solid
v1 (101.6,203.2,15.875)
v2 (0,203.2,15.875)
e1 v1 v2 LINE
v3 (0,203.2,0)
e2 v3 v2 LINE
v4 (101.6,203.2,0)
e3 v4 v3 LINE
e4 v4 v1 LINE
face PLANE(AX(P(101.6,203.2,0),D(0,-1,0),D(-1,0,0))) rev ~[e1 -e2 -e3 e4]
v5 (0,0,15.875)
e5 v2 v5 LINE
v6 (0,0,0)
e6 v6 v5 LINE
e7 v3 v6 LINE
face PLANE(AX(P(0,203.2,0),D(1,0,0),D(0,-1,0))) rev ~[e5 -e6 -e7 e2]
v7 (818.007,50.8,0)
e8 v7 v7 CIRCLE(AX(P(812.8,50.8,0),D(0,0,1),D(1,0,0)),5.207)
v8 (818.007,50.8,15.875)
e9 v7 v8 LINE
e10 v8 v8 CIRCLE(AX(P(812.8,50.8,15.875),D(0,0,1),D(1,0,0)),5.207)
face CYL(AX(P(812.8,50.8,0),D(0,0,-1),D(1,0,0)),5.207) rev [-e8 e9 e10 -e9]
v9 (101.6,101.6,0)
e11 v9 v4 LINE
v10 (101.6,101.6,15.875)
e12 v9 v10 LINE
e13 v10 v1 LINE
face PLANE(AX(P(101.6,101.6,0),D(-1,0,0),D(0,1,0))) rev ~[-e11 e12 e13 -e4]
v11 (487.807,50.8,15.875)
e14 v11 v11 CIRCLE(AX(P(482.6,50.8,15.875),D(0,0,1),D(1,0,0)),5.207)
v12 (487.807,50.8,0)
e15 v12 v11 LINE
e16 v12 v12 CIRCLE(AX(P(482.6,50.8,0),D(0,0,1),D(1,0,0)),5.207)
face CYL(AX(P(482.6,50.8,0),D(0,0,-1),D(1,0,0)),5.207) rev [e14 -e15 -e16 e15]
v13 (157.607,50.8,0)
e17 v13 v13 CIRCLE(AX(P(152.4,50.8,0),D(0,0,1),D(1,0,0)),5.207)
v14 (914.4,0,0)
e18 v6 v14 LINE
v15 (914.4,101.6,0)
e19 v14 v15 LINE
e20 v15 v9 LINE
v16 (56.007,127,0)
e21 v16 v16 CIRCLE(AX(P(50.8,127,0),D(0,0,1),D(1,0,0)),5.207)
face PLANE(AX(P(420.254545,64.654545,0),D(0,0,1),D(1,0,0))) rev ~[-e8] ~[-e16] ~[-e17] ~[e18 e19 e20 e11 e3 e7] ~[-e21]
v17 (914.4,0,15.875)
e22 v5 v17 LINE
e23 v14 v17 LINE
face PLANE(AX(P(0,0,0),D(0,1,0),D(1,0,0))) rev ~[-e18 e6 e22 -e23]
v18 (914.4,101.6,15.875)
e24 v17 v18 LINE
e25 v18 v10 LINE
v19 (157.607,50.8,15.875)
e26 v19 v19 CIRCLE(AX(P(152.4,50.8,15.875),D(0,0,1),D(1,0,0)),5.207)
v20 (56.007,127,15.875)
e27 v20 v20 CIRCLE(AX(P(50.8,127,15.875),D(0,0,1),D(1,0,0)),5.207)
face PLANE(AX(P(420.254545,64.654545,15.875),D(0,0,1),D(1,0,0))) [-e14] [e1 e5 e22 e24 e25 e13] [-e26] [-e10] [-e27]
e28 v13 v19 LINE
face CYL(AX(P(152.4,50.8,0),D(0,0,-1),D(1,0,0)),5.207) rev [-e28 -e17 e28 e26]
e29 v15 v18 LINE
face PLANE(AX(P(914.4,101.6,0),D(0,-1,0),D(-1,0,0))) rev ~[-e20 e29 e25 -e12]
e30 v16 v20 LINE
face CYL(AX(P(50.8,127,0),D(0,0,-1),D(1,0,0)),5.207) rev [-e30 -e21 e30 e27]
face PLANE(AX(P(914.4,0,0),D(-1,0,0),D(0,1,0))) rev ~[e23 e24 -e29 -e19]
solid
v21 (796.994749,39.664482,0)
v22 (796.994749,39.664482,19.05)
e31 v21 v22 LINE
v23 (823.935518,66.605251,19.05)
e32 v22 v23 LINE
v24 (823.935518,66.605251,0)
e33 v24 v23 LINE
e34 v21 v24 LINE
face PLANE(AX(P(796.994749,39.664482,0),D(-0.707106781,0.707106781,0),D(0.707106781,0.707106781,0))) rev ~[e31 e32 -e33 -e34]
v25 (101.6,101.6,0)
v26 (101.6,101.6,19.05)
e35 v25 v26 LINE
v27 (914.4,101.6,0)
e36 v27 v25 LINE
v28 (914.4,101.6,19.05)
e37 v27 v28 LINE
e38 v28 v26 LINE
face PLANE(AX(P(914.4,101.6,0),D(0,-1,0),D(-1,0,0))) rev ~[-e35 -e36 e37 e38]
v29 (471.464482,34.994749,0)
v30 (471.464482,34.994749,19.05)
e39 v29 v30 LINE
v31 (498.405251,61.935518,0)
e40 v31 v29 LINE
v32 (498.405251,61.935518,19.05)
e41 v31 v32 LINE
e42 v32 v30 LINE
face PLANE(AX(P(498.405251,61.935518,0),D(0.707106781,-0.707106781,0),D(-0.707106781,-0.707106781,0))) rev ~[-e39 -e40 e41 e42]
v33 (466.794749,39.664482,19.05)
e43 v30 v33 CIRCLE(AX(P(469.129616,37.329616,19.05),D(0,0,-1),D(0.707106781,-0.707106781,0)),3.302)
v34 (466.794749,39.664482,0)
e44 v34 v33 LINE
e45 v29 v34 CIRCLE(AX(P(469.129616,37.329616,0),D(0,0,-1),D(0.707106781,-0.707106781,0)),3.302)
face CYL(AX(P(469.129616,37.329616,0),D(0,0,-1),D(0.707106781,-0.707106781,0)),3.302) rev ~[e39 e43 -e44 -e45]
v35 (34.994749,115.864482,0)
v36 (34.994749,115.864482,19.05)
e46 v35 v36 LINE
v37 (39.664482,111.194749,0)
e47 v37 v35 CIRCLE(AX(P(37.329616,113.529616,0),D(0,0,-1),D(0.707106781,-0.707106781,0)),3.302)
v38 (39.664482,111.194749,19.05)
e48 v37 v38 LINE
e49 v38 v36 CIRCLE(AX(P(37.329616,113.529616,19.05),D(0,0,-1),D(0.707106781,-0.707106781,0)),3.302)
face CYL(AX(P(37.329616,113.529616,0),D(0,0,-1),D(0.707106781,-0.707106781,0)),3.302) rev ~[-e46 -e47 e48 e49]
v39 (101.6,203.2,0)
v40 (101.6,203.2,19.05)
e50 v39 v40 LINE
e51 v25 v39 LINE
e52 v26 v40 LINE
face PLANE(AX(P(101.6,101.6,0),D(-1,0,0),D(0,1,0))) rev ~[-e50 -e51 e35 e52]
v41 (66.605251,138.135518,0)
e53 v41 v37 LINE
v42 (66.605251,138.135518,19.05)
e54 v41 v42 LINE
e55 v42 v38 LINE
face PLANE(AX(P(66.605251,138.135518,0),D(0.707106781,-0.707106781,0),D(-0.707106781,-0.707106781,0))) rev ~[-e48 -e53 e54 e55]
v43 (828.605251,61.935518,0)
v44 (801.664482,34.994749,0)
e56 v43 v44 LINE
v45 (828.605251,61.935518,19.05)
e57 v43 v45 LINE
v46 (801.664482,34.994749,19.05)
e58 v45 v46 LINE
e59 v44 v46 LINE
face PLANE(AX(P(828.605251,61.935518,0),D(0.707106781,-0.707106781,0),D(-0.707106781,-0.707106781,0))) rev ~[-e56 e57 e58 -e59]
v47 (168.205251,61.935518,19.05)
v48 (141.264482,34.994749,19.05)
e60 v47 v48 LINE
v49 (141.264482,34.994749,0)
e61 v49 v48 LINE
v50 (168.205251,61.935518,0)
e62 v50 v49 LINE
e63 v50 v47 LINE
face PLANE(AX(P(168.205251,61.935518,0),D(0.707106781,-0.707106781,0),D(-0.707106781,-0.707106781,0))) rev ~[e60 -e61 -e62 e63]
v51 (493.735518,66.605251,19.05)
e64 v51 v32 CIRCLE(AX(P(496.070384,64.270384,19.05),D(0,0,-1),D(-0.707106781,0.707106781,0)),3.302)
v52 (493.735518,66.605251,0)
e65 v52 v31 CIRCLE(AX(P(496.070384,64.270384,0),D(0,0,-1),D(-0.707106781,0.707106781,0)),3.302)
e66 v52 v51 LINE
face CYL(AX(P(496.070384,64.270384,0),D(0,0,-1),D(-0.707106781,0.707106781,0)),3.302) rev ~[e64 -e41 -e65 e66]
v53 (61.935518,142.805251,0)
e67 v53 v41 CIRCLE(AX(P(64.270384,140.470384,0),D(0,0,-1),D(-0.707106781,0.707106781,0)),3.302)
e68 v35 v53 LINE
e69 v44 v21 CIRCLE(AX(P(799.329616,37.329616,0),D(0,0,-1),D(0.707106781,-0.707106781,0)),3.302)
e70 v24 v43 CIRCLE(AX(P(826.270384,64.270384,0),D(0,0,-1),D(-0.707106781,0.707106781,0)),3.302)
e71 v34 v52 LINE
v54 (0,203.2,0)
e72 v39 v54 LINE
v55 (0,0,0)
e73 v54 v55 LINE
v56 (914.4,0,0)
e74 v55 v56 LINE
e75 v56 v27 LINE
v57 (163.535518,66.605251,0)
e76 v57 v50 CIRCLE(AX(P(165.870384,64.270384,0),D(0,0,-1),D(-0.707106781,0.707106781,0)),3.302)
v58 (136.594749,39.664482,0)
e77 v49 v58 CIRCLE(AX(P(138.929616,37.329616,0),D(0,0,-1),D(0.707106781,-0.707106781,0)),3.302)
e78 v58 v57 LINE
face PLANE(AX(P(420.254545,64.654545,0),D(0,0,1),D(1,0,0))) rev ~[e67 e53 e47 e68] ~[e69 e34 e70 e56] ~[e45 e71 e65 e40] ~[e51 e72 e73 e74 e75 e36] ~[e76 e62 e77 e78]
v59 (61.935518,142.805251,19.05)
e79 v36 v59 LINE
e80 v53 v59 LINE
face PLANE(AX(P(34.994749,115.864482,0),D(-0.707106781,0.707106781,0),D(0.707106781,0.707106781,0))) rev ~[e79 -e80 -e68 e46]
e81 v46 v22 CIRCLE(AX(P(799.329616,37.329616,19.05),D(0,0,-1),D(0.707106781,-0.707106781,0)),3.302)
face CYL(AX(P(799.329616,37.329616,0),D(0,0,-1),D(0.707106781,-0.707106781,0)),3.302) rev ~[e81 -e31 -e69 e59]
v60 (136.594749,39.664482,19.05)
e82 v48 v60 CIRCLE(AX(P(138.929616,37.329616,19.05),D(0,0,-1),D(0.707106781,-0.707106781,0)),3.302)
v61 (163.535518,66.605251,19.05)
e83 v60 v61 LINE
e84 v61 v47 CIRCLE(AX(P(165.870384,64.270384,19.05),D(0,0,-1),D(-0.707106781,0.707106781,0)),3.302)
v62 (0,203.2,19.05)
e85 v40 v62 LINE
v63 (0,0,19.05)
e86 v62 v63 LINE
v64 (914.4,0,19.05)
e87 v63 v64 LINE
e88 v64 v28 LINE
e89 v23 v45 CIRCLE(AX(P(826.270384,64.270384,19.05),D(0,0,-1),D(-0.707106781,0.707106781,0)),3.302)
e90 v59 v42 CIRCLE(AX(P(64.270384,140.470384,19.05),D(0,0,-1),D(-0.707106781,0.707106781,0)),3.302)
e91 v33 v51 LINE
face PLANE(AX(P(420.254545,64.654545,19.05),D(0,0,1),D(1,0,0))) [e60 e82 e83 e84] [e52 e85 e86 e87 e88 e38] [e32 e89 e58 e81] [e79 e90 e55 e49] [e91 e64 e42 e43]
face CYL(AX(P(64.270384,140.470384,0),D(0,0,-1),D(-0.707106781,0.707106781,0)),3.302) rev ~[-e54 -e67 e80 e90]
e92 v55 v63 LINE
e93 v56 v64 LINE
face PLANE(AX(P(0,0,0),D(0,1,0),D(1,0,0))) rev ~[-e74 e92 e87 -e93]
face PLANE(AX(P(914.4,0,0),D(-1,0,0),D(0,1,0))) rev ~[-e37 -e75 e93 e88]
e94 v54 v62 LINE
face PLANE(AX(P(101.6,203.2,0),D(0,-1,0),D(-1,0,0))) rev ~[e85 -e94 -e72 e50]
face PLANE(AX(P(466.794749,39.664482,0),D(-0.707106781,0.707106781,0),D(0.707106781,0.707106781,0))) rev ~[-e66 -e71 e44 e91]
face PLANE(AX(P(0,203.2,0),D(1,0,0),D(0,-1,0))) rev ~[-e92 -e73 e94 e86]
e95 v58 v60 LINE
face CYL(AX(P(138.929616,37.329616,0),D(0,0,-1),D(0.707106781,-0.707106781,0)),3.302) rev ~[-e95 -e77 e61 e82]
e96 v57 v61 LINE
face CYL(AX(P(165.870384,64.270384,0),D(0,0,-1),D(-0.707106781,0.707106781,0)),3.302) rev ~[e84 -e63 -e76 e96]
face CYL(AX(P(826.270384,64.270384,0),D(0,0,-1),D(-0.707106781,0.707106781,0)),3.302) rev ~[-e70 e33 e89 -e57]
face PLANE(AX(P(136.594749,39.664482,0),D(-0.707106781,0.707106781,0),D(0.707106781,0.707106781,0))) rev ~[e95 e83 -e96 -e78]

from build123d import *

# Parameters (mm, degrees)
F2_DEPTH = 19.05
F0_R     = 5.207
F3_DEPTH = 15.875


# Not quite as in the source:
# - a length typed as a fraction of an inch, garbled in the dataset ("3 / 203.2 mm" for 3/8 in), is restored


with BuildPart() as f2:
    # F1 (on face) → F2 (new body)
    with BuildSketch(Plane.XY):
        Polygon((101.6, 203.2), (0, 203.2), (0, 0), (914.4, 0), (914.4, 101.6), (101.6, 101.6), align=None)
        with BuildLine():
            Line((168.2052507731, 61.9355175901), (141.2644824099, 34.9947492269))
            ThreePointArc((141.2644824099, 34.9947492269), (136.5947492269, 34.9947492269), (136.5947492269, 39.6644824099))
            Line((136.5947492269, 39.6644824099), (163.5355175901, 66.6052507731))
            ThreePointArc((163.5355175901, 66.6052507731), (168.2052507731, 66.6052507731), (168.2052507731, 61.9355175901))
        make_face(mode=Mode.SUBTRACT)
        with BuildLine():
            Line((498.4052507731, 61.9355175901), (471.4644824099, 34.9947492269))
            ThreePointArc((471.4644824099, 34.9947492269), (466.7947492269, 34.9947492269), (466.7947492269, 39.6644824099))
            Line((466.7947492269, 39.6644824099), (493.7355175901, 66.6052507731))
            ThreePointArc((493.7355175901, 66.6052507731), (498.4052507731, 66.6052507731), (498.4052507731, 61.9355175901))
        make_face(mode=Mode.SUBTRACT)
        with BuildLine():
            Line((828.6052507731, 61.9355175901), (801.6644824099, 34.9947492269))
            ThreePointArc((801.6644824099, 34.9947492269), (796.9947492269, 34.9947492269), (796.9947492269, 39.6644824099))
            Line((796.9947492269, 39.6644824099), (823.9355175901, 66.6052507731))
            ThreePointArc((823.9355175901, 66.6052507731), (828.6052507731, 66.6052507731), (828.6052507731, 61.9355175901))
        make_face(mode=Mode.SUBTRACT)
        with BuildLine():
            Line((66.6052507731, 138.1355175901), (39.6644824099, 111.1947492269))
            ThreePointArc((39.6644824099, 111.1947492269), (34.9947492269, 111.1947492269), (34.9947492269, 115.8644824099))
            Line((34.9947492269, 115.8644824099), (61.9355175901, 142.8052507731))
            ThreePointArc((61.9355175901, 142.8052507731), (66.6052507731, 142.8052507731), (66.6052507731, 138.1355175901))
        make_face(mode=Mode.SUBTRACT)
    extrude(amount=F2_DEPTH)


with BuildPart() as f3:
    # F0 (on Top) → F3 (new body)
    with BuildSketch(Plane.XY):
        Polygon((101.6, 203.2), (0, 203.2), (0, 0), (914.4, 0), (914.4, 101.6), (101.6, 101.6), align=None)
        with Locations((152.4, 50.8)):
            Circle(F0_R, mode=Mode.SUBTRACT)
        with Locations((482.6, 50.8)):
            Circle(F0_R, mode=Mode.SUBTRACT)
        with Locations((812.8, 50.8)):
            Circle(F0_R, mode=Mode.SUBTRACT)
        with Locations((50.8, 127)):
            Circle(F0_R, mode=Mode.SUBTRACT)
    extrude(amount=F3_DEPTH)


solid = Compound([f2.part, f3.part])
